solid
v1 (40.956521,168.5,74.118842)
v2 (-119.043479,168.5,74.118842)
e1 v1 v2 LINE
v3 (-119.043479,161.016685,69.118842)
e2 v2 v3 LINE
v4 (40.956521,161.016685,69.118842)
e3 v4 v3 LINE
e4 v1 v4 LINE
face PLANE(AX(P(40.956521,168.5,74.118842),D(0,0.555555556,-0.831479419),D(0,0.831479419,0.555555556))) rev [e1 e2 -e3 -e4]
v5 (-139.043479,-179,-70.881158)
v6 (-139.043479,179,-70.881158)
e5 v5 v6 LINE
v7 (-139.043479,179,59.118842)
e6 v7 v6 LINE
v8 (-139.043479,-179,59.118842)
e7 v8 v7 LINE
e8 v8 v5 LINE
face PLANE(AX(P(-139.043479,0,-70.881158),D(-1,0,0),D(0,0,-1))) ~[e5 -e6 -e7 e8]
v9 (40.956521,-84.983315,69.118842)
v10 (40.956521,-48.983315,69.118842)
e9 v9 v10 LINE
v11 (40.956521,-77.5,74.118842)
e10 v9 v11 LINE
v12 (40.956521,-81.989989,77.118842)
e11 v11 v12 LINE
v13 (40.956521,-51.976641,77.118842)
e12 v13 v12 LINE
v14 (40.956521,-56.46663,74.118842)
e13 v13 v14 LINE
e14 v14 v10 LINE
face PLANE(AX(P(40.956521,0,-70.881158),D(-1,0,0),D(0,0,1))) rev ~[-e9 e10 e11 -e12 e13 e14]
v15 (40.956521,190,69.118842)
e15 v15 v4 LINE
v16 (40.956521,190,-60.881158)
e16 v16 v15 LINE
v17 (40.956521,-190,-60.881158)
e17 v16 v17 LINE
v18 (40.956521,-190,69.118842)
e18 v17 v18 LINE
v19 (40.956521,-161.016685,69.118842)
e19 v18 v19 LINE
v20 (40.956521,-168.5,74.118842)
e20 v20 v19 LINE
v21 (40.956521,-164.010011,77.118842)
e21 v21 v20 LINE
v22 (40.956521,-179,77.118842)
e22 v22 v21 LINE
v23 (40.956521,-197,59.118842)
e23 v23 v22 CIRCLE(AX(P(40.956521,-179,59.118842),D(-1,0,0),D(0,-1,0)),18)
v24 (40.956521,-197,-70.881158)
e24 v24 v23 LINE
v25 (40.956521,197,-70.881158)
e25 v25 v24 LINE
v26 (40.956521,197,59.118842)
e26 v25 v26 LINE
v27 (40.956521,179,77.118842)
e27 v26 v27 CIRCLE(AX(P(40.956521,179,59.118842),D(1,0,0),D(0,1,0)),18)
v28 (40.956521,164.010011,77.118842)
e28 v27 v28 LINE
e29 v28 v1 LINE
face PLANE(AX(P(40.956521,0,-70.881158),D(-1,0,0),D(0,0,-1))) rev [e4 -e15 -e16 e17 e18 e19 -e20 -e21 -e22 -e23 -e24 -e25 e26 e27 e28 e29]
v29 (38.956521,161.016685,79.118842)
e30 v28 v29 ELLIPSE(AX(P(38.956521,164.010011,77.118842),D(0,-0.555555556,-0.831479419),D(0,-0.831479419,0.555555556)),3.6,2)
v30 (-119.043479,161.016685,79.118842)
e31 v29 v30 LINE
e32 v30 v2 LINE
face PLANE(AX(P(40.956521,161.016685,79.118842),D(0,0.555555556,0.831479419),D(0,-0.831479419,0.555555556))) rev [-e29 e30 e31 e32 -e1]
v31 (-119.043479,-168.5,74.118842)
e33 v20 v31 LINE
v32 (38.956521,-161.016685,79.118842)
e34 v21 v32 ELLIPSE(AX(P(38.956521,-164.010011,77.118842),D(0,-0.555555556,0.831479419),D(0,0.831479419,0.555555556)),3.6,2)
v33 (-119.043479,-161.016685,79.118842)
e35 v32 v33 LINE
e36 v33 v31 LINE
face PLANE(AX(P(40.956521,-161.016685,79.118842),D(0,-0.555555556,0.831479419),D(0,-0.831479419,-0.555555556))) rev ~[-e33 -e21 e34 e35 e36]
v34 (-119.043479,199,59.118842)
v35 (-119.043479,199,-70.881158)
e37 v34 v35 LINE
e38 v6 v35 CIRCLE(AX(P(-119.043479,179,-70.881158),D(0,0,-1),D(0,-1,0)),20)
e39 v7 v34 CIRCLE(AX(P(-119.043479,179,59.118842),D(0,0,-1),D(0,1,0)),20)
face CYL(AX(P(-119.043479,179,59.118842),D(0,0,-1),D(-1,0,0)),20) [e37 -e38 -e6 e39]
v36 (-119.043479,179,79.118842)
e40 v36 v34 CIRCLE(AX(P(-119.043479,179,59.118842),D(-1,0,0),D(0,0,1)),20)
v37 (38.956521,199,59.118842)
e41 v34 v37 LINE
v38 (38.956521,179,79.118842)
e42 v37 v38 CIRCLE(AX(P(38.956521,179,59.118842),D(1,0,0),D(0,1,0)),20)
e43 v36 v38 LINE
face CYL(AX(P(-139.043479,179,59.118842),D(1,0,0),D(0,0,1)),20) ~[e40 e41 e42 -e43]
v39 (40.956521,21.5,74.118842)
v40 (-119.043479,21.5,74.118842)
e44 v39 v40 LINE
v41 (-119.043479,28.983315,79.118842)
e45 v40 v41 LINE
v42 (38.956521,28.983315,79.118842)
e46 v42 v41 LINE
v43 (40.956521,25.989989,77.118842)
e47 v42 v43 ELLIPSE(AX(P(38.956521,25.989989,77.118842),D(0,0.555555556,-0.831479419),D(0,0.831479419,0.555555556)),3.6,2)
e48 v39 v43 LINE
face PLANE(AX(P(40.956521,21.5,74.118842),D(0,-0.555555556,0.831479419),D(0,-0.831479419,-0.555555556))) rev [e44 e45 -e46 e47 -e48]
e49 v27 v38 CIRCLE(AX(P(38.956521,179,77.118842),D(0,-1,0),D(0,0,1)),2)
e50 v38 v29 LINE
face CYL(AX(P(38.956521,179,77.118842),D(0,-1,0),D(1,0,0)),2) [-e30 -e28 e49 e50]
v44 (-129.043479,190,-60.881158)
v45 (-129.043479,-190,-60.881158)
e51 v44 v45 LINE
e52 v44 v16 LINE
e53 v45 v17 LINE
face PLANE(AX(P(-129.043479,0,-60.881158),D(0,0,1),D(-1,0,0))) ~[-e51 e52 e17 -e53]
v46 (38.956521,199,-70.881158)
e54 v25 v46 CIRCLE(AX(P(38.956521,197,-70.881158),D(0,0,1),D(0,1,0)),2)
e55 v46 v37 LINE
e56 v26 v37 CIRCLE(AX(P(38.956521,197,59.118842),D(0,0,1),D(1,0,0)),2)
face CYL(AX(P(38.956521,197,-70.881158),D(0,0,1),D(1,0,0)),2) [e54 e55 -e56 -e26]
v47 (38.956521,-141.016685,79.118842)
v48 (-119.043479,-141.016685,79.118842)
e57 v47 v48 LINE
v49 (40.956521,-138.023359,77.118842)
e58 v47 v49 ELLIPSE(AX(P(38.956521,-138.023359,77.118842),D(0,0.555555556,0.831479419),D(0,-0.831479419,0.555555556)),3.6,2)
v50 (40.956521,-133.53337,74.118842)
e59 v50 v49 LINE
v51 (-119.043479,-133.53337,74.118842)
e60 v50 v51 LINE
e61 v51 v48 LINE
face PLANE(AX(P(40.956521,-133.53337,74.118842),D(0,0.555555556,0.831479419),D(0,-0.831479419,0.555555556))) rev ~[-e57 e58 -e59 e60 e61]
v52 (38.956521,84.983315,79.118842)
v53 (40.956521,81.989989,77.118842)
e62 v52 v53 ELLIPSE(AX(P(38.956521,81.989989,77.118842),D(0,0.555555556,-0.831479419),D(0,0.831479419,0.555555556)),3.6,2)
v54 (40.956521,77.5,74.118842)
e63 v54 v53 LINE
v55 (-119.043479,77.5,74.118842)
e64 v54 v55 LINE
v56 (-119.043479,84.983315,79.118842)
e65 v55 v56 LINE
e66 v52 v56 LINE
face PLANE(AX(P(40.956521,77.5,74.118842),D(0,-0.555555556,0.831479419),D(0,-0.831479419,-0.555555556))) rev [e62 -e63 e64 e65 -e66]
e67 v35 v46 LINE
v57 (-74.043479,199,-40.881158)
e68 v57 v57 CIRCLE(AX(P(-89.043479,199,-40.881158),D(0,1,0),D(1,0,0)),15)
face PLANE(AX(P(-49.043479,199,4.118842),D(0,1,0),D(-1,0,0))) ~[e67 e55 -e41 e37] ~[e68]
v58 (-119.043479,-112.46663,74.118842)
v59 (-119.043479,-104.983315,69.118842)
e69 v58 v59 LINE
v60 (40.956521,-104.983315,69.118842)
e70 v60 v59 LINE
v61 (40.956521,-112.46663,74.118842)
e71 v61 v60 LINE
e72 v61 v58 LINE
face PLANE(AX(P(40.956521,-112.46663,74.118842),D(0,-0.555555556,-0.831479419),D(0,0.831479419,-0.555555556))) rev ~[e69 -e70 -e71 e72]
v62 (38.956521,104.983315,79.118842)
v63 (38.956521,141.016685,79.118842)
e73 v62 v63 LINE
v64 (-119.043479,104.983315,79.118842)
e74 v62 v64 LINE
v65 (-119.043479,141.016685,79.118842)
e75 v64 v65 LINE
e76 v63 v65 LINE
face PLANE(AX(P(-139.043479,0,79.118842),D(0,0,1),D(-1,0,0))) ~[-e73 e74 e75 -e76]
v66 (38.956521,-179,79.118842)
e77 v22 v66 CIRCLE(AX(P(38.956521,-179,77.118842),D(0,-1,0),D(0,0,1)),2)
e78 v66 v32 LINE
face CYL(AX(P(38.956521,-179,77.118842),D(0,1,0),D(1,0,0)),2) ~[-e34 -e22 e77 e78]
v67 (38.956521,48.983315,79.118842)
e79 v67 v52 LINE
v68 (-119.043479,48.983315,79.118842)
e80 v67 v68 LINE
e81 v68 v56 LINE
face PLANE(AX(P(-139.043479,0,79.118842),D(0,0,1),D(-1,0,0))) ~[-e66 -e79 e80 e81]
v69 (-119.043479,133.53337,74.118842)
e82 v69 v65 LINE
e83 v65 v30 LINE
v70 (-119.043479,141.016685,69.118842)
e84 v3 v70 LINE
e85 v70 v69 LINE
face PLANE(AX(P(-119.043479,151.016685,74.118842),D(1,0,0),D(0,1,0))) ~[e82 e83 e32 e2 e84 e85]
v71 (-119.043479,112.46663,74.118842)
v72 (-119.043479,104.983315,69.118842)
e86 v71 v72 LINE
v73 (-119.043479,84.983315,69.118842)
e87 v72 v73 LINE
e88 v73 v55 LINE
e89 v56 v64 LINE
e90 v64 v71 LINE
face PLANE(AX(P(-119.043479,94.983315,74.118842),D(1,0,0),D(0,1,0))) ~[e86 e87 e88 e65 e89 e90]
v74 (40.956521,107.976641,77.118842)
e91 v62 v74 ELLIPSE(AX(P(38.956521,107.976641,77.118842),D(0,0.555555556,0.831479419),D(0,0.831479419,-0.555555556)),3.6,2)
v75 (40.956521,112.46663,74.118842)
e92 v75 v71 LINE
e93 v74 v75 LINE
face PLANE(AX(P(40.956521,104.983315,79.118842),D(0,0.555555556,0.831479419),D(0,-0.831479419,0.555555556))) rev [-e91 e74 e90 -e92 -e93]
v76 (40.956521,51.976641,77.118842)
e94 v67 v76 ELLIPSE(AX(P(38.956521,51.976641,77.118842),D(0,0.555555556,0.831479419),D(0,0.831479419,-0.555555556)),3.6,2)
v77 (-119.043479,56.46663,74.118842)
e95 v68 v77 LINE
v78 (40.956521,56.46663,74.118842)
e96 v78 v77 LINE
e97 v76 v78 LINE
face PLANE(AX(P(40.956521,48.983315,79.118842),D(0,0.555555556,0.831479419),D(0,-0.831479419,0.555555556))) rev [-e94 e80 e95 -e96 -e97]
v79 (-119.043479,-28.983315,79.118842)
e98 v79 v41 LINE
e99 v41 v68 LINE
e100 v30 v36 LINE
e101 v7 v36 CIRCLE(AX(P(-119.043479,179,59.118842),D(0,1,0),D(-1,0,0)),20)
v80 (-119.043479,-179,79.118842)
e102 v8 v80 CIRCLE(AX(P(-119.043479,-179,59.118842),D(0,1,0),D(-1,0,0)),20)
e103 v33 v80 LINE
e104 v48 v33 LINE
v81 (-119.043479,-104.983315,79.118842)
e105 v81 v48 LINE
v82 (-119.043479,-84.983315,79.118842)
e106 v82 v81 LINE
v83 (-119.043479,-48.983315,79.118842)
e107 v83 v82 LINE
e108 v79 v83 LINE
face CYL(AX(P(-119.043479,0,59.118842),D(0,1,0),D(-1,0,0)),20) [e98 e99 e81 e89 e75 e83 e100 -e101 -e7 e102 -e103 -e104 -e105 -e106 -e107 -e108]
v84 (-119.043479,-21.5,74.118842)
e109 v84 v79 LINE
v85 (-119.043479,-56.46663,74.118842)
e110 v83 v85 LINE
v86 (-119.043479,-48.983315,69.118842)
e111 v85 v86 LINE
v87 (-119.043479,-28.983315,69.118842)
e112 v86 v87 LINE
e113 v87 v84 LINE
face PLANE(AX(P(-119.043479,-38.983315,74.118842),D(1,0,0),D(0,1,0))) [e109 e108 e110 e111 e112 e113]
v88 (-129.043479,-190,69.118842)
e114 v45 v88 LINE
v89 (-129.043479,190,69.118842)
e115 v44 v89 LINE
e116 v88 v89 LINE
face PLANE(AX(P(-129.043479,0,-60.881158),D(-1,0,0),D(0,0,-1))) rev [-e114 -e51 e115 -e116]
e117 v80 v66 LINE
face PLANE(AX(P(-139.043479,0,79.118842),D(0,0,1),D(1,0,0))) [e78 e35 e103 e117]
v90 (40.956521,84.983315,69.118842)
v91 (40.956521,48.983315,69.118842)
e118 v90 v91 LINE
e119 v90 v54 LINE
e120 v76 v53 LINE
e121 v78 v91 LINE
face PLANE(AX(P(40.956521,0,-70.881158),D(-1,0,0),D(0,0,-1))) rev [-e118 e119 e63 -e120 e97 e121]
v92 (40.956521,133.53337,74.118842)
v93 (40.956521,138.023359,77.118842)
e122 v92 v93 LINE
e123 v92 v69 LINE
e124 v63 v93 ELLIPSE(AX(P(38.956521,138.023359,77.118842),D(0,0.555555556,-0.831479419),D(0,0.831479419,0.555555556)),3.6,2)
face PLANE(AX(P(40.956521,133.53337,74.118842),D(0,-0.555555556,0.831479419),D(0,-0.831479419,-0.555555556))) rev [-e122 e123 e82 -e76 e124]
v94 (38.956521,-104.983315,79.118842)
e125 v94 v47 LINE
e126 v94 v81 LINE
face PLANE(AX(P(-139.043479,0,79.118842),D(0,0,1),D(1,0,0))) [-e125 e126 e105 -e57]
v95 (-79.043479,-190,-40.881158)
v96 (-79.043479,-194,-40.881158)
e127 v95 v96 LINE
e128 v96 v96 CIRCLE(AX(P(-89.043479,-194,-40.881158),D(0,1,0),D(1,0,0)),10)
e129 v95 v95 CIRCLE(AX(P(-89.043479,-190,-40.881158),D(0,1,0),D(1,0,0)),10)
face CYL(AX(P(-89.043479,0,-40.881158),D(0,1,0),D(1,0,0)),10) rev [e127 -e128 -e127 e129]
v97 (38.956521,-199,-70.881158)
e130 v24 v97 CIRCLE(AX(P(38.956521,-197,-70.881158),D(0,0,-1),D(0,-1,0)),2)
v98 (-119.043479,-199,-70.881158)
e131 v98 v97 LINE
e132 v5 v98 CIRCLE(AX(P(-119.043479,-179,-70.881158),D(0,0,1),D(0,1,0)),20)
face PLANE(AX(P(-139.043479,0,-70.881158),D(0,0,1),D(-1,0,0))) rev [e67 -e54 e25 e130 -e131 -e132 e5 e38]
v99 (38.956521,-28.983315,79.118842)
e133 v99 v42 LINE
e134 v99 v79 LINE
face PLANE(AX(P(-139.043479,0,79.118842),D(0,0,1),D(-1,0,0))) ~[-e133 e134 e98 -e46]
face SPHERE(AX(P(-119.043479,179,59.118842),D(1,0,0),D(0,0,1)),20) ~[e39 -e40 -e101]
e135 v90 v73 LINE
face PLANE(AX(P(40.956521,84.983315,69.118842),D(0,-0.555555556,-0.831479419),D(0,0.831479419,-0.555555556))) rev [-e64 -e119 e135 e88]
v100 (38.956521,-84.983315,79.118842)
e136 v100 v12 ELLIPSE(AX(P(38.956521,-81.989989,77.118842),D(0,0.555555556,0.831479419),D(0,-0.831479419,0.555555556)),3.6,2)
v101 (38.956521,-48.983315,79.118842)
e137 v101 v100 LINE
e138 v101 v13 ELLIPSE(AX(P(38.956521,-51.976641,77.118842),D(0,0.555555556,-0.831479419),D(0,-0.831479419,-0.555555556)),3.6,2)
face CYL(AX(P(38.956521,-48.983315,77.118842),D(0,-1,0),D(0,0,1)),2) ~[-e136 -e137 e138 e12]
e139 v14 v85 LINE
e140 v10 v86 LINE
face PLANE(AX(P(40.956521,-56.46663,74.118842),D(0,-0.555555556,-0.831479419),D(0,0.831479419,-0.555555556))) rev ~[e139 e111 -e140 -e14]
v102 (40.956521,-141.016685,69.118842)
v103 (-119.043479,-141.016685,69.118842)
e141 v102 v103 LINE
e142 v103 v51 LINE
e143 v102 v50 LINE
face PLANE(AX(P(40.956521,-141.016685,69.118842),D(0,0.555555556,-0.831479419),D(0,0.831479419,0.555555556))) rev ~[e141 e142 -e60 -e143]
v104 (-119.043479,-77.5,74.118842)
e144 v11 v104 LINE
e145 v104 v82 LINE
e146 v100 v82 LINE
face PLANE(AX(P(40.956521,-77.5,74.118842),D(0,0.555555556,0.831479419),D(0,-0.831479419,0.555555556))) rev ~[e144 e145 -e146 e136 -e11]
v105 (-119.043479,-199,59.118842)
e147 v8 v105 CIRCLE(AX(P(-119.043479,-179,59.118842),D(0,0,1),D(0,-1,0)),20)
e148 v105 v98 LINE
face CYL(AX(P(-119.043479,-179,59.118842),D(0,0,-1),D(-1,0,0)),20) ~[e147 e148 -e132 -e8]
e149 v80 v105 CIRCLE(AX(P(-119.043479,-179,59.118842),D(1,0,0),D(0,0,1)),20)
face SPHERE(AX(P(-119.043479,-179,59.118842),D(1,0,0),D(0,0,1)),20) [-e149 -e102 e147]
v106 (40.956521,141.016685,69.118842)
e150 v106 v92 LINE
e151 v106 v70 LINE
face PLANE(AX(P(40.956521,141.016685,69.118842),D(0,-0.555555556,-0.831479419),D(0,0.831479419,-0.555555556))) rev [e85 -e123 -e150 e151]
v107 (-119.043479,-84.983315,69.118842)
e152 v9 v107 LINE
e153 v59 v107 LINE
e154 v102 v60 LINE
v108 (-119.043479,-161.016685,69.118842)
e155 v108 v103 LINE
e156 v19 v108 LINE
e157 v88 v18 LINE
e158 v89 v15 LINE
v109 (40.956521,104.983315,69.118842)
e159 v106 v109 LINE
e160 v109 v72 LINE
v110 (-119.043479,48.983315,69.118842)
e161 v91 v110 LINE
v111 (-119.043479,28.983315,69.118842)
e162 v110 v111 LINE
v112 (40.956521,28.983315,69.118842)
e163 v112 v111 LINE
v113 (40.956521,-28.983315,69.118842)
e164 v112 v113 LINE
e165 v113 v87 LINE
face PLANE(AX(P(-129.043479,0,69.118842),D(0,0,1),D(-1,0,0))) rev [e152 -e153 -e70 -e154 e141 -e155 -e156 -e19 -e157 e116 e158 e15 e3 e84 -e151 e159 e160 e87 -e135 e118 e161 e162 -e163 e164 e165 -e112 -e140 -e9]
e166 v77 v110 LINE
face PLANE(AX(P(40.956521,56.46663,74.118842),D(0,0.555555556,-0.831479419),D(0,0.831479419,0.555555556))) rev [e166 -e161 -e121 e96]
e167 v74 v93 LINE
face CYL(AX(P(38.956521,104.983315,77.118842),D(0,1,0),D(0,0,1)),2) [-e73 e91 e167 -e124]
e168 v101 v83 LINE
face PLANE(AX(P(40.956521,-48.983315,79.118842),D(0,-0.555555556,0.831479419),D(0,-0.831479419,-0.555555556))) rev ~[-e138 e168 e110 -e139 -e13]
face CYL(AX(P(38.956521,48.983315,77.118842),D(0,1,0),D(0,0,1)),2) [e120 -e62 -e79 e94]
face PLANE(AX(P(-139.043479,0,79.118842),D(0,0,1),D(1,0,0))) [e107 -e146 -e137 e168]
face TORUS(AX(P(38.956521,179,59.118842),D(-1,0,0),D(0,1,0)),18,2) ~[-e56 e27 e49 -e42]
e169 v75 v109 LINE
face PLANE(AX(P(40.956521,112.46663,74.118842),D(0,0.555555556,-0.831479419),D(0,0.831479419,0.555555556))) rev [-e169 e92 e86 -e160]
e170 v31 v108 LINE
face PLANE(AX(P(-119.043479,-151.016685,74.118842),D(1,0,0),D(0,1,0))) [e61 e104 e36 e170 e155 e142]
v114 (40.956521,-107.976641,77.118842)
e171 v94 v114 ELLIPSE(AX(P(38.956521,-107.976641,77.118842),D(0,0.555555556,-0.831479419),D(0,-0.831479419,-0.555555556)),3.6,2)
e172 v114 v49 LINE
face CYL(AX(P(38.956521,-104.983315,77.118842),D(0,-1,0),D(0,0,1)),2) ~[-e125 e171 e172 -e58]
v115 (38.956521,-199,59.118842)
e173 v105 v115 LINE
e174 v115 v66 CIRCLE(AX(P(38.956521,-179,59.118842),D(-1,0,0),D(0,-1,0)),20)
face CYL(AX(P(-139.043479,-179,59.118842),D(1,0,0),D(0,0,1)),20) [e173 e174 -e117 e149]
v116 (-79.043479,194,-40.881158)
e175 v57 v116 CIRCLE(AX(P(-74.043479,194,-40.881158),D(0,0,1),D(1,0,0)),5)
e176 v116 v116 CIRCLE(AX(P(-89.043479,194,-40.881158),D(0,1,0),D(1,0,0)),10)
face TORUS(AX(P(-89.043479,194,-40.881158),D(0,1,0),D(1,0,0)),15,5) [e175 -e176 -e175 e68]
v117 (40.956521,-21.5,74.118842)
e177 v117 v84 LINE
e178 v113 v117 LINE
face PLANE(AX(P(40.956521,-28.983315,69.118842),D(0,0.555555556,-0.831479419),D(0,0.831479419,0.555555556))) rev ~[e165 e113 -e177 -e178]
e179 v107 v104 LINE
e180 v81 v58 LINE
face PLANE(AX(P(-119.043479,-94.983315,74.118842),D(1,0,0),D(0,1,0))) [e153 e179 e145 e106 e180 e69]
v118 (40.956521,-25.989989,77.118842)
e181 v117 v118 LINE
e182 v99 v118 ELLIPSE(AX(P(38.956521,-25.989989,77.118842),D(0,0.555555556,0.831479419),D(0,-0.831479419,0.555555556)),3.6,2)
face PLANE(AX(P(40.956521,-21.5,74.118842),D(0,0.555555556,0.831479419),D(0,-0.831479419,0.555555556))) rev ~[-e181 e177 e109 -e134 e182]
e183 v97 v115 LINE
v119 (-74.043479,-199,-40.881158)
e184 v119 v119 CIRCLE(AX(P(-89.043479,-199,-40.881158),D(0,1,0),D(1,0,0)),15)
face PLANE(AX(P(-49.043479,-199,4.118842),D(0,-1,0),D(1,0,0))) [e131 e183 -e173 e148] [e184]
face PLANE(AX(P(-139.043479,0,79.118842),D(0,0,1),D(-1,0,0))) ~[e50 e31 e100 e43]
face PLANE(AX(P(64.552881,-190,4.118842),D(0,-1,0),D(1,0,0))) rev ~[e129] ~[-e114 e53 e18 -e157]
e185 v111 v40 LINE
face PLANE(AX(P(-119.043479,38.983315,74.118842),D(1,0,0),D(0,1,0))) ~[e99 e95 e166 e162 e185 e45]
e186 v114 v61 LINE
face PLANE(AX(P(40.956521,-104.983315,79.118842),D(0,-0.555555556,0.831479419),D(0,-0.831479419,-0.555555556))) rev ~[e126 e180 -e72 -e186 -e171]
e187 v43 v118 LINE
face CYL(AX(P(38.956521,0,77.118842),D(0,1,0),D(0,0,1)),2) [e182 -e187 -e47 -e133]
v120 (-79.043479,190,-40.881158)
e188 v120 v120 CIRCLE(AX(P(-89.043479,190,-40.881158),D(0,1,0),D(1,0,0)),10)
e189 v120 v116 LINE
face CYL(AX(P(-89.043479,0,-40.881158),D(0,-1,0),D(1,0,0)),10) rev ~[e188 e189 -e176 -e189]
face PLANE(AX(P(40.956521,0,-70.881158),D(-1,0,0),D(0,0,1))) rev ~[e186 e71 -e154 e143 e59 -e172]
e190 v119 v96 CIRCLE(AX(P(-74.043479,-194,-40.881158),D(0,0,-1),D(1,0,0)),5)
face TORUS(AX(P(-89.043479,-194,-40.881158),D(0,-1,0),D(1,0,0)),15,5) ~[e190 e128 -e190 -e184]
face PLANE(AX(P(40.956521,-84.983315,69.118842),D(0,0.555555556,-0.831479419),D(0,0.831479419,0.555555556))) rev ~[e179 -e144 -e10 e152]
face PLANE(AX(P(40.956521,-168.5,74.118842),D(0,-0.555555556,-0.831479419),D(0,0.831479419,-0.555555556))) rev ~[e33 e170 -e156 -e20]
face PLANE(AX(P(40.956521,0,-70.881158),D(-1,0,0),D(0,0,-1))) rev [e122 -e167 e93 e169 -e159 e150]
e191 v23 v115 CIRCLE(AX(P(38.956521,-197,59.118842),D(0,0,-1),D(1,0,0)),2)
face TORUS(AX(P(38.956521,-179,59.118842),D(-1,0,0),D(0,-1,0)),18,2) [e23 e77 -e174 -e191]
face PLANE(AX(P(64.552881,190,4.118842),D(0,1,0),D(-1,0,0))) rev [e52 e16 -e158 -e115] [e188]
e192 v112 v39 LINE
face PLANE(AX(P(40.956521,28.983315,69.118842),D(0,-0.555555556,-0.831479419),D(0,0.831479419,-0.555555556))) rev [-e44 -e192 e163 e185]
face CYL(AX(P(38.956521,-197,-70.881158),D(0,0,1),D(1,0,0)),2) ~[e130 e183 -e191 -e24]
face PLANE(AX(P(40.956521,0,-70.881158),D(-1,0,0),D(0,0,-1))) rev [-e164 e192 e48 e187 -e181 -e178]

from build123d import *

# Parameters (mm, degrees)
F0_W     = 180
F0_H     = 150
F1_DEPTH = 199
F2_R     = 20
F3_R     = 20
F4_W     = 387.1927191635
F4_H     = 130
F5_DEPTH = 190
F7_DEPTH = 160
F8_R     = 10
F9_DEPTH = 264.3
F10_R    = 2
F11_R    = 5


with BuildPart() as f1:
    # F0 (on Front) → F1 (new body)
    with BuildSketch(Plane.XZ):
        with Locations((-49.0434786677, 4.1188420764)):
            Rectangle(F0_W, F0_H)
    extrude(amount=F1_DEPTH)

    # F2
    f2_edges = [f1.edges().sort_by_distance(p)[0] for p in [
        (-49.043479, -199, 79.118842),
    ]]
    fillet(f2_edges, radius=F2_R)

    # F3
    f3_edges = [f1.edges().sort_by_distance(p)[0] for p in [
        (-139.043479, -89.5, 79.118842),
    ]]
    fillet(f3_edges, radius=F3_R)

    # F4 (on Front) → F5 (cut)
    with BuildSketch(Plane.XZ):
        with Locations((64.552880914, 4.1188420764)):
            Rectangle(F4_W, F4_H)
    extrude(amount=F5_DEPTH, mode=Mode.SUBTRACT)

    # F6 (on face) → F7 (cut)
    with BuildSketch(Plane.YZ.offset(40.9565213323)):
        Polygon((-133.5333704529, 74.1188420764), (-141.0166852265, 79.1188420764), (-161.0166852265, 79.1188420764), (-168.5, 74.1188420764), (-161.0166852265, 69.1188420764), (-141.0166852265, 69.1188420764), align=None)
        Polygon((-84.9833147735, 79.1188420764), (-104.9833147735, 79.1188420764), (-112.4666295471, 74.1188420764), (-104.9833147735, 69.1188420764), (-84.9833147735, 69.1188420764), (-77.5, 74.1188420764), align=None)
        Polygon((-28.9833147735, 79.1188420764), (-48.9833147735, 79.1188420764), (-56.4666295471, 74.1188420764), (-48.9833147735, 69.1188420764), (-28.9833147735, 69.1188420764), (-21.5, 74.1188420764), align=None)
    extrude(amount=-F7_DEPTH, mode=Mode.SUBTRACT)

    # F8 (on Front) → F9 (cut)
    with BuildSketch(Plane.XZ):
        with Locations((-89.0434786677, -40.8811579236)):
            Circle(F8_R)
    extrude(amount=F9_DEPTH, mode=Mode.SUBTRACT)

    # F10
    f10_edges = [f1.edges().sort_by_distance(p)[0] for p in [
        (40.956521, -199, -5.881158),
        (40.956521, -193.142136, 73.260978),
        (40.956521, -123, 79.118842),
        (40.956521, -66.983315, 79.118842),
        (40.956521, -14.491657, 79.118842),
    ]]
    fillet(f10_edges, radius=F10_R)

    # F11
    f11_edges = [f1.edges().sort_by_distance(p)[0] for p in [
        (-99.043479, -199, -40.881158),
    ]]
    fillet(f11_edges, radius=F11_R)

    # F12: F1 across plane


with BuildPart() as f1_1:
    add(f1.part)
    add(f1.part.mirror(Plane.XZ))


solid = f1_1.part
